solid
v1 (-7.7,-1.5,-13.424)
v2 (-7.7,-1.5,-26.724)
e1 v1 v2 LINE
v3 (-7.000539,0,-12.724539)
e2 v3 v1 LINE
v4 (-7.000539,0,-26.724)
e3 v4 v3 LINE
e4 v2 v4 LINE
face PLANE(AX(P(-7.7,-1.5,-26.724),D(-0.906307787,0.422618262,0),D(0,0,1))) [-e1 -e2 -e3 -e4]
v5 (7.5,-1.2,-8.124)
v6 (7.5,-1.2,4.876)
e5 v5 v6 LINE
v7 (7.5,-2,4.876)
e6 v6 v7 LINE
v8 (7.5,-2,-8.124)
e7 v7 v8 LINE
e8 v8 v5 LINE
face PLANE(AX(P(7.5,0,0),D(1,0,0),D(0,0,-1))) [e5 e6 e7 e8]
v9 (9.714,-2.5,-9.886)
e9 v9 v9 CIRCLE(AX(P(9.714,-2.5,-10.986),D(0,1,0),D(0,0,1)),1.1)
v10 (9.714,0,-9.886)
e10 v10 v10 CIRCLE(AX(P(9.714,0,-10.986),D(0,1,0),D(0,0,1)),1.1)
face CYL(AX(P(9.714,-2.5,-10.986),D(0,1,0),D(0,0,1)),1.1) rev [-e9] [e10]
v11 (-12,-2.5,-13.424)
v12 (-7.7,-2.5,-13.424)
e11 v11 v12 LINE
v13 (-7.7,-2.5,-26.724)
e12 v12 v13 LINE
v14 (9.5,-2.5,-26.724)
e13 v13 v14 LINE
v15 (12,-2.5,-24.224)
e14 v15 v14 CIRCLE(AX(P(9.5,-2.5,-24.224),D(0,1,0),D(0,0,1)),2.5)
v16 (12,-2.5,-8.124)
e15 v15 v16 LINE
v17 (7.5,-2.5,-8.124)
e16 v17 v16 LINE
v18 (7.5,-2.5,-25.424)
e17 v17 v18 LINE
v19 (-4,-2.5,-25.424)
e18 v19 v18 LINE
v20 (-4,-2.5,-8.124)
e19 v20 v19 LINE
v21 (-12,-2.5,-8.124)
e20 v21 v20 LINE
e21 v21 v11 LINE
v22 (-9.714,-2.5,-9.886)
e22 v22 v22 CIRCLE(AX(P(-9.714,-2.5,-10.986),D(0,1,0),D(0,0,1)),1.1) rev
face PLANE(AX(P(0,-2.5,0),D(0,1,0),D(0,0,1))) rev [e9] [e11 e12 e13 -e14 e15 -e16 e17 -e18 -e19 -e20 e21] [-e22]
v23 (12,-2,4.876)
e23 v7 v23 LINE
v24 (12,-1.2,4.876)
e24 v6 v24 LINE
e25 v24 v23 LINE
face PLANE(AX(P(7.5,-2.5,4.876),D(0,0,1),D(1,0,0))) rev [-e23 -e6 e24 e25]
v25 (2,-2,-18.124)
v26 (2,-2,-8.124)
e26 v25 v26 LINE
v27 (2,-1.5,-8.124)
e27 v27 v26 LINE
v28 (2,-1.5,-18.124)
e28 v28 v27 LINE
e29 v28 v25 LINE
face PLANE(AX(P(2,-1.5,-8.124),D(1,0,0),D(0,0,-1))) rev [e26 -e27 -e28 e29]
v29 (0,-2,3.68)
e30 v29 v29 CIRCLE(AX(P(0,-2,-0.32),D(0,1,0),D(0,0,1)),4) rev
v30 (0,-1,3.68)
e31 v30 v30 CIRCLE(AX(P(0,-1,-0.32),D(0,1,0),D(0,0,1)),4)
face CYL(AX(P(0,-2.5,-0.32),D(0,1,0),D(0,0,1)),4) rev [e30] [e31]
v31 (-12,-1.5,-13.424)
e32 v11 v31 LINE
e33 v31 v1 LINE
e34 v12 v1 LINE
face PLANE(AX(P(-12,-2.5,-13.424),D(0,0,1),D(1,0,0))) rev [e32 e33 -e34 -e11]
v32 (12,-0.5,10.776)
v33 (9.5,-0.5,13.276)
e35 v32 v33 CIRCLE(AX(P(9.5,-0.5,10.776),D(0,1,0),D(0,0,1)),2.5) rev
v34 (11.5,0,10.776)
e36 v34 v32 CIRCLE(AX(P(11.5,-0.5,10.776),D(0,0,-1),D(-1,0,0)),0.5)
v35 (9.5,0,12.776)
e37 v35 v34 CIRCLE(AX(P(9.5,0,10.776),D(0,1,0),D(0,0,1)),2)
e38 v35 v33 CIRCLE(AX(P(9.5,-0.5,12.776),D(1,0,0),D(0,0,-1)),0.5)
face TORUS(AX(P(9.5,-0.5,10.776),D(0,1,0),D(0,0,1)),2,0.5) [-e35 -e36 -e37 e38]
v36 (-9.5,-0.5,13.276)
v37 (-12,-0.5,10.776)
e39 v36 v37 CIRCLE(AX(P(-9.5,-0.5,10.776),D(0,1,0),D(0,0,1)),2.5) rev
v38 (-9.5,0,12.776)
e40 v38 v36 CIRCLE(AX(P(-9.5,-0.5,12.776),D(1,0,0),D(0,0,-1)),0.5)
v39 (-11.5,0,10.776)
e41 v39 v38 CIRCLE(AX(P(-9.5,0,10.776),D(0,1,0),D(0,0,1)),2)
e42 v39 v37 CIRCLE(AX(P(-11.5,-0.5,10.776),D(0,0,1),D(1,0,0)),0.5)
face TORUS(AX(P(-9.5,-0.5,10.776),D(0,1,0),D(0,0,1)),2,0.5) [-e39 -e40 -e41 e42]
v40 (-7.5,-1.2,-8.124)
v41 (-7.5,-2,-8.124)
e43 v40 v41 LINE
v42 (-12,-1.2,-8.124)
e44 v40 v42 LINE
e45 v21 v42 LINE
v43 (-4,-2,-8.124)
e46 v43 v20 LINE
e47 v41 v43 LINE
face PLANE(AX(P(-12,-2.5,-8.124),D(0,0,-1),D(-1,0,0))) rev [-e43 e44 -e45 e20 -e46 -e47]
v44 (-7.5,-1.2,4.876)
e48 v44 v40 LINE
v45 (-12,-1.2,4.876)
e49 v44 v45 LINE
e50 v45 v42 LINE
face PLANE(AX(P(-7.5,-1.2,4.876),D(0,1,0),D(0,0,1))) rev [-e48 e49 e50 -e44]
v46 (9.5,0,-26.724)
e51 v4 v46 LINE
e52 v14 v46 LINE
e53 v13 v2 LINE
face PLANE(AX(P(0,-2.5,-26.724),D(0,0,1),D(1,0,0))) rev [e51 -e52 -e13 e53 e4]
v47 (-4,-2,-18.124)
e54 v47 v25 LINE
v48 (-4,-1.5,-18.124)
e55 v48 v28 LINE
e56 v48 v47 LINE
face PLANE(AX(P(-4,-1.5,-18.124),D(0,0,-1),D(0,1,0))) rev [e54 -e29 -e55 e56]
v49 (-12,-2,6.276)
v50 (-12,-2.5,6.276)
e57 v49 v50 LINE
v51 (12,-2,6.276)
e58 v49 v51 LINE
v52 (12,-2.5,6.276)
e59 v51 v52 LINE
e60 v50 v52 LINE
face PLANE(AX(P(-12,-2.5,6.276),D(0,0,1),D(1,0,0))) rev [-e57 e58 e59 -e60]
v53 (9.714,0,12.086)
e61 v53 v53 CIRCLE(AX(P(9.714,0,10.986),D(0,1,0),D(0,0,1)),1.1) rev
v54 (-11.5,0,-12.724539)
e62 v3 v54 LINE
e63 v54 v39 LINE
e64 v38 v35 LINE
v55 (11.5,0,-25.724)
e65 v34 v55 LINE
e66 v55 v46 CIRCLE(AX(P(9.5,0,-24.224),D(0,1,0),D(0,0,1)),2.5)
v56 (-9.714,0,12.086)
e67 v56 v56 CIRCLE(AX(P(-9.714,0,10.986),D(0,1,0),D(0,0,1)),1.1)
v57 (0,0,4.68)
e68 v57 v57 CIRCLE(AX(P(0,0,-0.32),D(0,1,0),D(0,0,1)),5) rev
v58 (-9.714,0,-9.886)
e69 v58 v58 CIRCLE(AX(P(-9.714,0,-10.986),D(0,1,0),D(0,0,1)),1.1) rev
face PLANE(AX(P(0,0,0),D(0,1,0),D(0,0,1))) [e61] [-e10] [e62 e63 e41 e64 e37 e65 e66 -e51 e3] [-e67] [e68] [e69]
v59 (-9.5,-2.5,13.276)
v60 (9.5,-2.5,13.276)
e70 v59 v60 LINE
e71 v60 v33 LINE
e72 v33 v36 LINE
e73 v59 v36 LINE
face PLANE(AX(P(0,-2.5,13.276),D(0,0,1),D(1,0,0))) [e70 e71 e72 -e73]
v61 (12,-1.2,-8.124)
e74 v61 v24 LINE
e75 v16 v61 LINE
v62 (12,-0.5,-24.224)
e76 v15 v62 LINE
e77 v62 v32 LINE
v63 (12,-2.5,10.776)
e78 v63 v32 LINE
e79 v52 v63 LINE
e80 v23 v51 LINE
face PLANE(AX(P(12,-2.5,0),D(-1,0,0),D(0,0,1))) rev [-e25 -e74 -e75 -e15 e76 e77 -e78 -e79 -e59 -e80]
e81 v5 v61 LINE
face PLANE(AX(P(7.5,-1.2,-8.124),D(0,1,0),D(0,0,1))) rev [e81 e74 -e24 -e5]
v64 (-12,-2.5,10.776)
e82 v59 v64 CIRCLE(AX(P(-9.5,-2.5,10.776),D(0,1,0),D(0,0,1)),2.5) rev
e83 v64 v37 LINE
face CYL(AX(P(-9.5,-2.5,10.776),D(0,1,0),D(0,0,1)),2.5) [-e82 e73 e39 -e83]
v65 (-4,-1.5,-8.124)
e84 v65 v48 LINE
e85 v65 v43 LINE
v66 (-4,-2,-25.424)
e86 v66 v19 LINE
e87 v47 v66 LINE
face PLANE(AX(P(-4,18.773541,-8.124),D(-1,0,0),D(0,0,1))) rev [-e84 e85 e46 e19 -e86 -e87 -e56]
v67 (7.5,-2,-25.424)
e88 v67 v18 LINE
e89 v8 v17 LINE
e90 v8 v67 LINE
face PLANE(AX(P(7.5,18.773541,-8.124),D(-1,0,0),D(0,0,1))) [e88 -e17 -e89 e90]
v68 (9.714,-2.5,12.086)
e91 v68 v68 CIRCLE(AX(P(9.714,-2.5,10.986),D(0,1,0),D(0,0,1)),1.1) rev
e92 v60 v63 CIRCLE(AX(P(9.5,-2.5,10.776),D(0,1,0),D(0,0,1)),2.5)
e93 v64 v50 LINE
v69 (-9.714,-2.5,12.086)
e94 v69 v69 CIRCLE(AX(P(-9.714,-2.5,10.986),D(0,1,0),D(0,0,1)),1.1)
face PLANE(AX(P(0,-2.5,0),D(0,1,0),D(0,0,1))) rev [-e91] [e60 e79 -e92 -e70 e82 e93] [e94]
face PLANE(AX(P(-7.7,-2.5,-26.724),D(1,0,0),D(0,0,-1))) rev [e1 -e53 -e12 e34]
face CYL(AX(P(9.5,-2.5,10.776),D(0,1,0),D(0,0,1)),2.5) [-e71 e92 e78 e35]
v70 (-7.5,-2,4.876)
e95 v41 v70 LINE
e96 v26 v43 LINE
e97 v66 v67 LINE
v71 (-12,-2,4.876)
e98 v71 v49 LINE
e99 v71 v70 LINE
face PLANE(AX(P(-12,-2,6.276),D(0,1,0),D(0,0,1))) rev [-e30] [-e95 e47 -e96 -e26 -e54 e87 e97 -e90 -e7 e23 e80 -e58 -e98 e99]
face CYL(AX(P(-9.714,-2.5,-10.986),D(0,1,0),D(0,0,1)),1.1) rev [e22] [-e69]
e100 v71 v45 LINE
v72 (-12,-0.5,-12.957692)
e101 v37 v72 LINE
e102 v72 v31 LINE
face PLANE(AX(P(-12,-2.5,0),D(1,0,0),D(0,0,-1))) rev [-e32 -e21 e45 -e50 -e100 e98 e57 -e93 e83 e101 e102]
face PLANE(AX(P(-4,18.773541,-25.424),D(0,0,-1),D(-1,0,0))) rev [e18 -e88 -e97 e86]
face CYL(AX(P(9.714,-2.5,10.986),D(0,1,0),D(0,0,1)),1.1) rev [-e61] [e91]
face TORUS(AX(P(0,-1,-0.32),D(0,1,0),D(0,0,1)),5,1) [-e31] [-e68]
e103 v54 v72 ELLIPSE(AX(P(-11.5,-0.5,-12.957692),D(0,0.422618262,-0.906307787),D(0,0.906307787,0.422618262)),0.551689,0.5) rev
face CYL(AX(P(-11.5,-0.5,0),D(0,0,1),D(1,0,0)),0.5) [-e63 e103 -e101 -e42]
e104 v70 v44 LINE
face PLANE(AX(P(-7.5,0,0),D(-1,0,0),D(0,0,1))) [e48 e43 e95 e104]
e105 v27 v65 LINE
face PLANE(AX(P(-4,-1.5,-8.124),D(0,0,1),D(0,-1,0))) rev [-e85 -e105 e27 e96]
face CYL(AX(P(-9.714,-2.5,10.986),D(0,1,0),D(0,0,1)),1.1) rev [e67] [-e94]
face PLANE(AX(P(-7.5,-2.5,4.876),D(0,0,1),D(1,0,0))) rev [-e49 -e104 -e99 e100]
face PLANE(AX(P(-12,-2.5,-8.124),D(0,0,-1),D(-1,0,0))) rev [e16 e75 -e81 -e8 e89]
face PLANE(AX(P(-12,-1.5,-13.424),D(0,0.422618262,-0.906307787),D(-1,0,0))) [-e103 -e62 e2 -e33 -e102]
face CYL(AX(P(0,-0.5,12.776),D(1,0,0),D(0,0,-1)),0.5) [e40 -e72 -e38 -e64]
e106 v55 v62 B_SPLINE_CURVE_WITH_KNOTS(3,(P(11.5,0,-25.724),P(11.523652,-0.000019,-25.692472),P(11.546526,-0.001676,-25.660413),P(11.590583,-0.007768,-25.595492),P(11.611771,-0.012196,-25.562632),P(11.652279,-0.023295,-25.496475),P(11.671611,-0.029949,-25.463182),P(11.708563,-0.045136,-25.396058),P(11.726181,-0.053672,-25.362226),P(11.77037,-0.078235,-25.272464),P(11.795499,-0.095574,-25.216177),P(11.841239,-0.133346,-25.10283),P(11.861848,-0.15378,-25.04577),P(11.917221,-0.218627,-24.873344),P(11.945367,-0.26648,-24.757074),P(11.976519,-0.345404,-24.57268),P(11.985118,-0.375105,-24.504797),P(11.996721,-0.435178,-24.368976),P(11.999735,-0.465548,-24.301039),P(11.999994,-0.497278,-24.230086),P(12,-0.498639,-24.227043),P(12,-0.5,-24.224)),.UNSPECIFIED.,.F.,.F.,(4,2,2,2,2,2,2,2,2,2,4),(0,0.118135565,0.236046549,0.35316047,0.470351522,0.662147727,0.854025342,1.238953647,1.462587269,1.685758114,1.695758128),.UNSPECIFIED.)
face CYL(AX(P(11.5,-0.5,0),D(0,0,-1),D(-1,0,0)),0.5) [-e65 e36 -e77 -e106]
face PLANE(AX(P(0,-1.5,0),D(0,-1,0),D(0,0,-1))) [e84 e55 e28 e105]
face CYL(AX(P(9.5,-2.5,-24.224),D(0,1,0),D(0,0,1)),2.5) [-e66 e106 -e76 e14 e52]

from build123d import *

# Parameters (mm, degrees)
SKETCH_1_R           = 1.1
SKETCH_1_R_2         = 4
EXTRUDE_1_DEPTH      = 2.5
SKETCH_2_W           = 14.4
SKETCH_2_H           = 0.5
CUT_EXTRUDE_1_DEPTH  = 37.005863078
SKETCH_3_W           = 13
SKETCH_3_H           = 1.3
CUT_EXTRUDE_2_DEPTH  = 4.5
SKETCH_4_W           = 13
SKETCH_4_H           = 1.3
CUT_EXTRUDE_3_DEPTH  = 4.5
SKETCH_5_W           = 11.5
SKETCH_5_H           = 17.3
CUT_EXTRUDE_11_DEPTH = 0.5
SKETCH_6_W           = 6
SKETCH_6_H           = 10
CUT_EXTRUDE_12_DEPTH = 0.5
FILLET_1_R           = 0.5
FILLET_2_R           = 1
SKETCH_7_W           = 4.3
SKETCH_7_H           = 13.3
CUT_EXTRUDE_13_DEPTH = 30.401057536
CHAMFER_1_SIZE       = 0.699461487
CHAMFER_1_SIZE_2     = 1.5


with BuildPart() as part:
    # 草图1 → 凸台-拉伸1 (new body)
    with BuildSketch(Plane(origin=(0, 0, 0), x_dir=(1, 0, 0), z_dir=(0, 1, 0))):
        with BuildLine():
            Line((-12, 24.224), (-12, -10.776))
            ThreePointArc((-12, -10.776), (-11.267766953, -12.543766953), (-9.5, -13.276))
            Line((-9.5, -13.276), (9.5, -13.276))
            ThreePointArc((9.5, -13.276), (11.267766953, -12.543766953), (12, -10.776))
            Line((12, -10.776), (12, 24.224))
            ThreePointArc((12, 24.224), (11.267766953, 25.991766953), (9.5, 26.724))
            Line((9.5, 26.724), (-9.5, 26.724))
            ThreePointArc((-9.5, 26.724), (-11.267766953, 25.991766953), (-12, 24.224))
        make_face()
        with Locations(Location((-9.714, -10.986, 0), (0, 0, 270))):
            Circle(SKETCH_1_R, mode=Mode.SUBTRACT)
        with Locations(Location((0, 0.32, 0), (0, 0, 270))):
            Circle(SKETCH_1_R_2, mode=Mode.SUBTRACT)
        with Locations(Location((9.714, -10.986, 0), (0, 0, 270))):
            Circle(SKETCH_1_R, mode=Mode.SUBTRACT)
        with Locations(Location((9.714, 10.986, 0), (0, 0, 270))):
            Circle(SKETCH_1_R, mode=Mode.SUBTRACT)
        with Locations(Location((-9.714, 10.986, 0), (0, 0, 270))):
            Circle(SKETCH_1_R, mode=Mode.SUBTRACT)
    extrude(amount=-EXTRUDE_1_DEPTH)

    # 草图2 → 切除-拉伸1 (cut, through all)
    with BuildSketch(Plane(origin=(12, 0, 0), x_dir=(0, 0, -1), z_dir=(1, 0, 0))):
        with Locations((0.924, -2.25)):
            Rectangle(SKETCH_2_W, SKETCH_2_H)
    extrude(amount=-CUT_EXTRUDE_1_DEPTH, mode=Mode.SUBTRACT)

    # 草图3 → 切除-拉伸2 (cut)
    with BuildSketch(Plane(origin=(12, 0, 0), x_dir=(0, 0, -1), z_dir=(1, 0, 0))):
        with Locations((1.624, -1.85)):
            Rectangle(SKETCH_3_W, SKETCH_3_H)
    extrude(amount=-CUT_EXTRUDE_2_DEPTH, mode=Mode.SUBTRACT)

    # 草图4 → 切除-拉伸3 (cut)
    with BuildSketch(Plane.ZY.offset(12)):
        with Locations((-1.624, -1.85)):
            Rectangle(SKETCH_4_W, SKETCH_4_H)
    extrude(amount=-CUT_EXTRUDE_3_DEPTH, mode=Mode.SUBTRACT)

    # 草图5 → 切除-拉伸11 (cut)
    with BuildSketch(Plane.XZ.offset(2.5)):
        with Locations((1.75, -16.774)):
            Rectangle(SKETCH_5_W, SKETCH_5_H)
    extrude(amount=-CUT_EXTRUDE_11_DEPTH, mode=Mode.SUBTRACT)

    # 草图6 → 切除-拉伸12 (cut)
    with BuildSketch(Plane.XZ.offset(2)):
        with Locations((-1, -13.124)):
            Rectangle(SKETCH_6_W, SKETCH_6_H)
    extrude(amount=-CUT_EXTRUDE_12_DEPTH, mode=Mode.SUBTRACT)

    # 圆角1
    # the kernel refuses this fillet: 0.5 mm, written as the material it takes off along each edge
    with BuildSketch(Plane(origin=(-9.5, 0, 13.276), x_dir=(0, 0, -1), z_dir=(1, 0, 0))) as fillet_1_piece_1:
        with BuildLine():
            CenterArc((FILLET_1_R, -FILLET_1_R), FILLET_1_R, 90, 90)
            Line((0, -FILLET_1_R), (-FILLET_1_R * 0.02, -FILLET_1_R))
            Line((-FILLET_1_R * 0.02, -FILLET_1_R), (-FILLET_1_R * 0.02, FILLET_1_R * 0.02))
            Line((-FILLET_1_R * 0.02, FILLET_1_R * 0.02), (FILLET_1_R, FILLET_1_R * 0.02))
            Line((FILLET_1_R, FILLET_1_R * 0.02), (FILLET_1_R, 0))
        make_face()
    extrude(amount=19, mode=Mode.SUBTRACT)
    with BuildSketch(Plane(origin=(-9.5, 0, 10.776), x_dir=(-1, 0, 0), z_dir=(0, 0, -1))) as fillet_1_piece_2:
        with BuildLine():
            CenterArc((2.5 - FILLET_1_R, -FILLET_1_R), FILLET_1_R, 0, 90)
            Line((2.5, -FILLET_1_R), (2.5 + FILLET_1_R * 0.02, -FILLET_1_R))
            Line((2.5 + FILLET_1_R * 0.02, -FILLET_1_R), (2.5 + FILLET_1_R * 0.02, FILLET_1_R * 0.02))
            Line((2.5 + FILLET_1_R * 0.02, FILLET_1_R * 0.02), (2.5 - FILLET_1_R, FILLET_1_R * 0.02))
            Line((2.5 - FILLET_1_R, FILLET_1_R * 0.02), (2.5 - FILLET_1_R, 0))
        make_face()
    revolve(axis=Axis((-9.5, 0, 10.776), (0, 1, 0)), revolution_arc=90, mode=Mode.SUBTRACT)
    with BuildSketch(Plane(origin=(-12, 0, -27.224), x_dir=(0, -1, 0), z_dir=(0, 0, 1))) as fillet_1_piece_3:
        with BuildLine():
            CenterArc((FILLET_1_R, FILLET_1_R), FILLET_1_R, 180, 90)
            Line((0, FILLET_1_R), (-FILLET_1_R * 0.02, FILLET_1_R))
            Line((-FILLET_1_R * 0.02, FILLET_1_R), (-FILLET_1_R * 0.02, -FILLET_1_R * 0.02))
            Line((-FILLET_1_R * 0.02, -FILLET_1_R * 0.02), (FILLET_1_R, -FILLET_1_R * 0.02))
            Line((FILLET_1_R, -FILLET_1_R * 0.02), (FILLET_1_R, 0))
        make_face()
    extrude(amount=38, mode=Mode.SUBTRACT)
    with BuildSketch(Plane(origin=(12, 0, 10.776), x_dir=(-1, 0, 0), z_dir=(0, 0, -1))) as fillet_1_piece_4:
        with BuildLine():
            CenterArc((FILLET_1_R, -FILLET_1_R), FILLET_1_R, 90, 90)
            Line((0, -FILLET_1_R), (-FILLET_1_R * 0.02, -FILLET_1_R))
            Line((-FILLET_1_R * 0.02, -FILLET_1_R), (-FILLET_1_R * 0.02, FILLET_1_R * 0.02))
            Line((-FILLET_1_R * 0.02, FILLET_1_R * 0.02), (FILLET_1_R, FILLET_1_R * 0.02))
            Line((FILLET_1_R, FILLET_1_R * 0.02), (FILLET_1_R, 0))
        make_face()
    extrude(amount=38, mode=Mode.SUBTRACT)
    with BuildSketch(Plane(origin=(9.5, 0, 10.776), x_dir=(0, 0, 1), z_dir=(-1, 0, 0))) as fillet_1_piece_5:
        with BuildLine():
            CenterArc((2.5 - FILLET_1_R, -FILLET_1_R), FILLET_1_R, 0, 90)
            Line((2.5, -FILLET_1_R), (2.5 + FILLET_1_R * 0.02, -FILLET_1_R))
            Line((2.5 + FILLET_1_R * 0.02, -FILLET_1_R), (2.5 + FILLET_1_R * 0.02, FILLET_1_R * 0.02))
            Line((2.5 + FILLET_1_R * 0.02, FILLET_1_R * 0.02), (2.5 - FILLET_1_R, FILLET_1_R * 0.02))
            Line((2.5 - FILLET_1_R, FILLET_1_R * 0.02), (2.5 - FILLET_1_R, 0))
        make_face()
    revolve(axis=Axis((9.5, 0, 10.776), (0, 1, 0)), revolution_arc=90, mode=Mode.SUBTRACT)

    # 圆角2
    fillet_2_edges = [part.edges().sort_by_distance(p)[0] for p in [
        (0, 0, -4.32),
    ]]
    fillet(fillet_2_edges, radius=FILLET_2_R)

    # 草图7 → 切除-拉伸13 (cut, through all)
    with BuildSketch(Plane(origin=(0, 0, 0), x_dir=(1, 0, 0), z_dir=(0, 1, 0))):
        with Locations((-9.85, 20.074)):
            Rectangle(SKETCH_7_W, SKETCH_7_H)
    extrude(amount=-CUT_EXTRUDE_13_DEPTH, mode=Mode.SUBTRACT)

    # 倒角1
    # the kernel refuses this chamfer: 1.5, 0.699461487 mm, written as the material it takes off along each edge
    with BuildSketch(Plane(origin=(-7.7, 0, -13.424), x_dir=(0, 0.07481330637059964, 0.9971975577536774), z_dir=(-1, 0, 0))) as chamfer_1_piece_1:
        Polygon((CHAMFER_1_SIZE * 0.997197558085, -CHAMFER_1_SIZE * 0.0748133063955), (-CHAMFER_1_SIZE_2 * 0.0748133063706, -CHAMFER_1_SIZE_2 * 0.997197557754), (0, 0), align=None)
    extrude(amount=7.686463207, mode=Mode.SUBTRACT)
    with BuildSketch(Plane(origin=(-7.7, 0, -30.610463207), x_dir=(0.9971975577536775, 0.07481330637059957, 0), z_dir=(0, 0, 1))) as chamfer_1_piece_2:
        Polygon((CHAMFER_1_SIZE * 0.997197558085, -CHAMFER_1_SIZE * 0.0748133063955), (-CHAMFER_1_SIZE_2 * 0.0748133063706, -CHAMFER_1_SIZE_2 * 0.997197557754), (0, 0), align=None)
    extrude(amount=17.186463207, mode=Mode.SUBTRACT)
    with BuildSketch(Plane(origin=(-3.813536793, 0, -13.424), x_dir=(0, 0.07481330637059964, 0.9971975577536774), z_dir=(-1, 0, 0))) as chamfer_1_piece_3a_section:
        Polygon((CHAMFER_1_SIZE * 0.997197558085, -CHAMFER_1_SIZE * 0.0748133063955), (-CHAMFER_1_SIZE_2 * 0.0748133063706, -CHAMFER_1_SIZE_2 * 0.997197557754), (0, 0), align=None)
    chamfer_1_piece_3a = extrude(amount=11.572926414, mode=Mode.PRIVATE)
    chamfer_1_piece_3a = split(chamfer_1_piece_3a, bisect_by=Plane(origin=(-7.7, -0.507353362, -13.203429624), z_dir=(1, 0, 0)), keep=Keep.TOP, mode=Mode.PRIVATE)
    with BuildSketch(Plane(origin=(-7.7, 0, -30.610463207), x_dir=(0.9971975577536775, 0.07481330637059957, 0), z_dir=(0, 0, 1))) as chamfer_1_piece_3b_section:
        Polygon((CHAMFER_1_SIZE * 0.997197558085, -CHAMFER_1_SIZE * 0.0748133063955), (-CHAMFER_1_SIZE_2 * 0.0748133063706, -CHAMFER_1_SIZE_2 * 0.997197557754), (0, 0), align=None)
    chamfer_1_piece_3b = extrude(amount=21.072926414, mode=Mode.PRIVATE)
    chamfer_1_piece_3b = split(chamfer_1_piece_3b, bisect_by=Plane(origin=(-7.479429624, -0.507353362, -13.424), z_dir=(0, 0, 1)), keep=Keep.TOP, mode=Mode.PRIVATE)
    chamfer_1_piece_3 = chamfer_1_piece_3a & chamfer_1_piece_3b
    add(chamfer_1_piece_3, mode=Mode.SUBTRACT)


solid = part.part
